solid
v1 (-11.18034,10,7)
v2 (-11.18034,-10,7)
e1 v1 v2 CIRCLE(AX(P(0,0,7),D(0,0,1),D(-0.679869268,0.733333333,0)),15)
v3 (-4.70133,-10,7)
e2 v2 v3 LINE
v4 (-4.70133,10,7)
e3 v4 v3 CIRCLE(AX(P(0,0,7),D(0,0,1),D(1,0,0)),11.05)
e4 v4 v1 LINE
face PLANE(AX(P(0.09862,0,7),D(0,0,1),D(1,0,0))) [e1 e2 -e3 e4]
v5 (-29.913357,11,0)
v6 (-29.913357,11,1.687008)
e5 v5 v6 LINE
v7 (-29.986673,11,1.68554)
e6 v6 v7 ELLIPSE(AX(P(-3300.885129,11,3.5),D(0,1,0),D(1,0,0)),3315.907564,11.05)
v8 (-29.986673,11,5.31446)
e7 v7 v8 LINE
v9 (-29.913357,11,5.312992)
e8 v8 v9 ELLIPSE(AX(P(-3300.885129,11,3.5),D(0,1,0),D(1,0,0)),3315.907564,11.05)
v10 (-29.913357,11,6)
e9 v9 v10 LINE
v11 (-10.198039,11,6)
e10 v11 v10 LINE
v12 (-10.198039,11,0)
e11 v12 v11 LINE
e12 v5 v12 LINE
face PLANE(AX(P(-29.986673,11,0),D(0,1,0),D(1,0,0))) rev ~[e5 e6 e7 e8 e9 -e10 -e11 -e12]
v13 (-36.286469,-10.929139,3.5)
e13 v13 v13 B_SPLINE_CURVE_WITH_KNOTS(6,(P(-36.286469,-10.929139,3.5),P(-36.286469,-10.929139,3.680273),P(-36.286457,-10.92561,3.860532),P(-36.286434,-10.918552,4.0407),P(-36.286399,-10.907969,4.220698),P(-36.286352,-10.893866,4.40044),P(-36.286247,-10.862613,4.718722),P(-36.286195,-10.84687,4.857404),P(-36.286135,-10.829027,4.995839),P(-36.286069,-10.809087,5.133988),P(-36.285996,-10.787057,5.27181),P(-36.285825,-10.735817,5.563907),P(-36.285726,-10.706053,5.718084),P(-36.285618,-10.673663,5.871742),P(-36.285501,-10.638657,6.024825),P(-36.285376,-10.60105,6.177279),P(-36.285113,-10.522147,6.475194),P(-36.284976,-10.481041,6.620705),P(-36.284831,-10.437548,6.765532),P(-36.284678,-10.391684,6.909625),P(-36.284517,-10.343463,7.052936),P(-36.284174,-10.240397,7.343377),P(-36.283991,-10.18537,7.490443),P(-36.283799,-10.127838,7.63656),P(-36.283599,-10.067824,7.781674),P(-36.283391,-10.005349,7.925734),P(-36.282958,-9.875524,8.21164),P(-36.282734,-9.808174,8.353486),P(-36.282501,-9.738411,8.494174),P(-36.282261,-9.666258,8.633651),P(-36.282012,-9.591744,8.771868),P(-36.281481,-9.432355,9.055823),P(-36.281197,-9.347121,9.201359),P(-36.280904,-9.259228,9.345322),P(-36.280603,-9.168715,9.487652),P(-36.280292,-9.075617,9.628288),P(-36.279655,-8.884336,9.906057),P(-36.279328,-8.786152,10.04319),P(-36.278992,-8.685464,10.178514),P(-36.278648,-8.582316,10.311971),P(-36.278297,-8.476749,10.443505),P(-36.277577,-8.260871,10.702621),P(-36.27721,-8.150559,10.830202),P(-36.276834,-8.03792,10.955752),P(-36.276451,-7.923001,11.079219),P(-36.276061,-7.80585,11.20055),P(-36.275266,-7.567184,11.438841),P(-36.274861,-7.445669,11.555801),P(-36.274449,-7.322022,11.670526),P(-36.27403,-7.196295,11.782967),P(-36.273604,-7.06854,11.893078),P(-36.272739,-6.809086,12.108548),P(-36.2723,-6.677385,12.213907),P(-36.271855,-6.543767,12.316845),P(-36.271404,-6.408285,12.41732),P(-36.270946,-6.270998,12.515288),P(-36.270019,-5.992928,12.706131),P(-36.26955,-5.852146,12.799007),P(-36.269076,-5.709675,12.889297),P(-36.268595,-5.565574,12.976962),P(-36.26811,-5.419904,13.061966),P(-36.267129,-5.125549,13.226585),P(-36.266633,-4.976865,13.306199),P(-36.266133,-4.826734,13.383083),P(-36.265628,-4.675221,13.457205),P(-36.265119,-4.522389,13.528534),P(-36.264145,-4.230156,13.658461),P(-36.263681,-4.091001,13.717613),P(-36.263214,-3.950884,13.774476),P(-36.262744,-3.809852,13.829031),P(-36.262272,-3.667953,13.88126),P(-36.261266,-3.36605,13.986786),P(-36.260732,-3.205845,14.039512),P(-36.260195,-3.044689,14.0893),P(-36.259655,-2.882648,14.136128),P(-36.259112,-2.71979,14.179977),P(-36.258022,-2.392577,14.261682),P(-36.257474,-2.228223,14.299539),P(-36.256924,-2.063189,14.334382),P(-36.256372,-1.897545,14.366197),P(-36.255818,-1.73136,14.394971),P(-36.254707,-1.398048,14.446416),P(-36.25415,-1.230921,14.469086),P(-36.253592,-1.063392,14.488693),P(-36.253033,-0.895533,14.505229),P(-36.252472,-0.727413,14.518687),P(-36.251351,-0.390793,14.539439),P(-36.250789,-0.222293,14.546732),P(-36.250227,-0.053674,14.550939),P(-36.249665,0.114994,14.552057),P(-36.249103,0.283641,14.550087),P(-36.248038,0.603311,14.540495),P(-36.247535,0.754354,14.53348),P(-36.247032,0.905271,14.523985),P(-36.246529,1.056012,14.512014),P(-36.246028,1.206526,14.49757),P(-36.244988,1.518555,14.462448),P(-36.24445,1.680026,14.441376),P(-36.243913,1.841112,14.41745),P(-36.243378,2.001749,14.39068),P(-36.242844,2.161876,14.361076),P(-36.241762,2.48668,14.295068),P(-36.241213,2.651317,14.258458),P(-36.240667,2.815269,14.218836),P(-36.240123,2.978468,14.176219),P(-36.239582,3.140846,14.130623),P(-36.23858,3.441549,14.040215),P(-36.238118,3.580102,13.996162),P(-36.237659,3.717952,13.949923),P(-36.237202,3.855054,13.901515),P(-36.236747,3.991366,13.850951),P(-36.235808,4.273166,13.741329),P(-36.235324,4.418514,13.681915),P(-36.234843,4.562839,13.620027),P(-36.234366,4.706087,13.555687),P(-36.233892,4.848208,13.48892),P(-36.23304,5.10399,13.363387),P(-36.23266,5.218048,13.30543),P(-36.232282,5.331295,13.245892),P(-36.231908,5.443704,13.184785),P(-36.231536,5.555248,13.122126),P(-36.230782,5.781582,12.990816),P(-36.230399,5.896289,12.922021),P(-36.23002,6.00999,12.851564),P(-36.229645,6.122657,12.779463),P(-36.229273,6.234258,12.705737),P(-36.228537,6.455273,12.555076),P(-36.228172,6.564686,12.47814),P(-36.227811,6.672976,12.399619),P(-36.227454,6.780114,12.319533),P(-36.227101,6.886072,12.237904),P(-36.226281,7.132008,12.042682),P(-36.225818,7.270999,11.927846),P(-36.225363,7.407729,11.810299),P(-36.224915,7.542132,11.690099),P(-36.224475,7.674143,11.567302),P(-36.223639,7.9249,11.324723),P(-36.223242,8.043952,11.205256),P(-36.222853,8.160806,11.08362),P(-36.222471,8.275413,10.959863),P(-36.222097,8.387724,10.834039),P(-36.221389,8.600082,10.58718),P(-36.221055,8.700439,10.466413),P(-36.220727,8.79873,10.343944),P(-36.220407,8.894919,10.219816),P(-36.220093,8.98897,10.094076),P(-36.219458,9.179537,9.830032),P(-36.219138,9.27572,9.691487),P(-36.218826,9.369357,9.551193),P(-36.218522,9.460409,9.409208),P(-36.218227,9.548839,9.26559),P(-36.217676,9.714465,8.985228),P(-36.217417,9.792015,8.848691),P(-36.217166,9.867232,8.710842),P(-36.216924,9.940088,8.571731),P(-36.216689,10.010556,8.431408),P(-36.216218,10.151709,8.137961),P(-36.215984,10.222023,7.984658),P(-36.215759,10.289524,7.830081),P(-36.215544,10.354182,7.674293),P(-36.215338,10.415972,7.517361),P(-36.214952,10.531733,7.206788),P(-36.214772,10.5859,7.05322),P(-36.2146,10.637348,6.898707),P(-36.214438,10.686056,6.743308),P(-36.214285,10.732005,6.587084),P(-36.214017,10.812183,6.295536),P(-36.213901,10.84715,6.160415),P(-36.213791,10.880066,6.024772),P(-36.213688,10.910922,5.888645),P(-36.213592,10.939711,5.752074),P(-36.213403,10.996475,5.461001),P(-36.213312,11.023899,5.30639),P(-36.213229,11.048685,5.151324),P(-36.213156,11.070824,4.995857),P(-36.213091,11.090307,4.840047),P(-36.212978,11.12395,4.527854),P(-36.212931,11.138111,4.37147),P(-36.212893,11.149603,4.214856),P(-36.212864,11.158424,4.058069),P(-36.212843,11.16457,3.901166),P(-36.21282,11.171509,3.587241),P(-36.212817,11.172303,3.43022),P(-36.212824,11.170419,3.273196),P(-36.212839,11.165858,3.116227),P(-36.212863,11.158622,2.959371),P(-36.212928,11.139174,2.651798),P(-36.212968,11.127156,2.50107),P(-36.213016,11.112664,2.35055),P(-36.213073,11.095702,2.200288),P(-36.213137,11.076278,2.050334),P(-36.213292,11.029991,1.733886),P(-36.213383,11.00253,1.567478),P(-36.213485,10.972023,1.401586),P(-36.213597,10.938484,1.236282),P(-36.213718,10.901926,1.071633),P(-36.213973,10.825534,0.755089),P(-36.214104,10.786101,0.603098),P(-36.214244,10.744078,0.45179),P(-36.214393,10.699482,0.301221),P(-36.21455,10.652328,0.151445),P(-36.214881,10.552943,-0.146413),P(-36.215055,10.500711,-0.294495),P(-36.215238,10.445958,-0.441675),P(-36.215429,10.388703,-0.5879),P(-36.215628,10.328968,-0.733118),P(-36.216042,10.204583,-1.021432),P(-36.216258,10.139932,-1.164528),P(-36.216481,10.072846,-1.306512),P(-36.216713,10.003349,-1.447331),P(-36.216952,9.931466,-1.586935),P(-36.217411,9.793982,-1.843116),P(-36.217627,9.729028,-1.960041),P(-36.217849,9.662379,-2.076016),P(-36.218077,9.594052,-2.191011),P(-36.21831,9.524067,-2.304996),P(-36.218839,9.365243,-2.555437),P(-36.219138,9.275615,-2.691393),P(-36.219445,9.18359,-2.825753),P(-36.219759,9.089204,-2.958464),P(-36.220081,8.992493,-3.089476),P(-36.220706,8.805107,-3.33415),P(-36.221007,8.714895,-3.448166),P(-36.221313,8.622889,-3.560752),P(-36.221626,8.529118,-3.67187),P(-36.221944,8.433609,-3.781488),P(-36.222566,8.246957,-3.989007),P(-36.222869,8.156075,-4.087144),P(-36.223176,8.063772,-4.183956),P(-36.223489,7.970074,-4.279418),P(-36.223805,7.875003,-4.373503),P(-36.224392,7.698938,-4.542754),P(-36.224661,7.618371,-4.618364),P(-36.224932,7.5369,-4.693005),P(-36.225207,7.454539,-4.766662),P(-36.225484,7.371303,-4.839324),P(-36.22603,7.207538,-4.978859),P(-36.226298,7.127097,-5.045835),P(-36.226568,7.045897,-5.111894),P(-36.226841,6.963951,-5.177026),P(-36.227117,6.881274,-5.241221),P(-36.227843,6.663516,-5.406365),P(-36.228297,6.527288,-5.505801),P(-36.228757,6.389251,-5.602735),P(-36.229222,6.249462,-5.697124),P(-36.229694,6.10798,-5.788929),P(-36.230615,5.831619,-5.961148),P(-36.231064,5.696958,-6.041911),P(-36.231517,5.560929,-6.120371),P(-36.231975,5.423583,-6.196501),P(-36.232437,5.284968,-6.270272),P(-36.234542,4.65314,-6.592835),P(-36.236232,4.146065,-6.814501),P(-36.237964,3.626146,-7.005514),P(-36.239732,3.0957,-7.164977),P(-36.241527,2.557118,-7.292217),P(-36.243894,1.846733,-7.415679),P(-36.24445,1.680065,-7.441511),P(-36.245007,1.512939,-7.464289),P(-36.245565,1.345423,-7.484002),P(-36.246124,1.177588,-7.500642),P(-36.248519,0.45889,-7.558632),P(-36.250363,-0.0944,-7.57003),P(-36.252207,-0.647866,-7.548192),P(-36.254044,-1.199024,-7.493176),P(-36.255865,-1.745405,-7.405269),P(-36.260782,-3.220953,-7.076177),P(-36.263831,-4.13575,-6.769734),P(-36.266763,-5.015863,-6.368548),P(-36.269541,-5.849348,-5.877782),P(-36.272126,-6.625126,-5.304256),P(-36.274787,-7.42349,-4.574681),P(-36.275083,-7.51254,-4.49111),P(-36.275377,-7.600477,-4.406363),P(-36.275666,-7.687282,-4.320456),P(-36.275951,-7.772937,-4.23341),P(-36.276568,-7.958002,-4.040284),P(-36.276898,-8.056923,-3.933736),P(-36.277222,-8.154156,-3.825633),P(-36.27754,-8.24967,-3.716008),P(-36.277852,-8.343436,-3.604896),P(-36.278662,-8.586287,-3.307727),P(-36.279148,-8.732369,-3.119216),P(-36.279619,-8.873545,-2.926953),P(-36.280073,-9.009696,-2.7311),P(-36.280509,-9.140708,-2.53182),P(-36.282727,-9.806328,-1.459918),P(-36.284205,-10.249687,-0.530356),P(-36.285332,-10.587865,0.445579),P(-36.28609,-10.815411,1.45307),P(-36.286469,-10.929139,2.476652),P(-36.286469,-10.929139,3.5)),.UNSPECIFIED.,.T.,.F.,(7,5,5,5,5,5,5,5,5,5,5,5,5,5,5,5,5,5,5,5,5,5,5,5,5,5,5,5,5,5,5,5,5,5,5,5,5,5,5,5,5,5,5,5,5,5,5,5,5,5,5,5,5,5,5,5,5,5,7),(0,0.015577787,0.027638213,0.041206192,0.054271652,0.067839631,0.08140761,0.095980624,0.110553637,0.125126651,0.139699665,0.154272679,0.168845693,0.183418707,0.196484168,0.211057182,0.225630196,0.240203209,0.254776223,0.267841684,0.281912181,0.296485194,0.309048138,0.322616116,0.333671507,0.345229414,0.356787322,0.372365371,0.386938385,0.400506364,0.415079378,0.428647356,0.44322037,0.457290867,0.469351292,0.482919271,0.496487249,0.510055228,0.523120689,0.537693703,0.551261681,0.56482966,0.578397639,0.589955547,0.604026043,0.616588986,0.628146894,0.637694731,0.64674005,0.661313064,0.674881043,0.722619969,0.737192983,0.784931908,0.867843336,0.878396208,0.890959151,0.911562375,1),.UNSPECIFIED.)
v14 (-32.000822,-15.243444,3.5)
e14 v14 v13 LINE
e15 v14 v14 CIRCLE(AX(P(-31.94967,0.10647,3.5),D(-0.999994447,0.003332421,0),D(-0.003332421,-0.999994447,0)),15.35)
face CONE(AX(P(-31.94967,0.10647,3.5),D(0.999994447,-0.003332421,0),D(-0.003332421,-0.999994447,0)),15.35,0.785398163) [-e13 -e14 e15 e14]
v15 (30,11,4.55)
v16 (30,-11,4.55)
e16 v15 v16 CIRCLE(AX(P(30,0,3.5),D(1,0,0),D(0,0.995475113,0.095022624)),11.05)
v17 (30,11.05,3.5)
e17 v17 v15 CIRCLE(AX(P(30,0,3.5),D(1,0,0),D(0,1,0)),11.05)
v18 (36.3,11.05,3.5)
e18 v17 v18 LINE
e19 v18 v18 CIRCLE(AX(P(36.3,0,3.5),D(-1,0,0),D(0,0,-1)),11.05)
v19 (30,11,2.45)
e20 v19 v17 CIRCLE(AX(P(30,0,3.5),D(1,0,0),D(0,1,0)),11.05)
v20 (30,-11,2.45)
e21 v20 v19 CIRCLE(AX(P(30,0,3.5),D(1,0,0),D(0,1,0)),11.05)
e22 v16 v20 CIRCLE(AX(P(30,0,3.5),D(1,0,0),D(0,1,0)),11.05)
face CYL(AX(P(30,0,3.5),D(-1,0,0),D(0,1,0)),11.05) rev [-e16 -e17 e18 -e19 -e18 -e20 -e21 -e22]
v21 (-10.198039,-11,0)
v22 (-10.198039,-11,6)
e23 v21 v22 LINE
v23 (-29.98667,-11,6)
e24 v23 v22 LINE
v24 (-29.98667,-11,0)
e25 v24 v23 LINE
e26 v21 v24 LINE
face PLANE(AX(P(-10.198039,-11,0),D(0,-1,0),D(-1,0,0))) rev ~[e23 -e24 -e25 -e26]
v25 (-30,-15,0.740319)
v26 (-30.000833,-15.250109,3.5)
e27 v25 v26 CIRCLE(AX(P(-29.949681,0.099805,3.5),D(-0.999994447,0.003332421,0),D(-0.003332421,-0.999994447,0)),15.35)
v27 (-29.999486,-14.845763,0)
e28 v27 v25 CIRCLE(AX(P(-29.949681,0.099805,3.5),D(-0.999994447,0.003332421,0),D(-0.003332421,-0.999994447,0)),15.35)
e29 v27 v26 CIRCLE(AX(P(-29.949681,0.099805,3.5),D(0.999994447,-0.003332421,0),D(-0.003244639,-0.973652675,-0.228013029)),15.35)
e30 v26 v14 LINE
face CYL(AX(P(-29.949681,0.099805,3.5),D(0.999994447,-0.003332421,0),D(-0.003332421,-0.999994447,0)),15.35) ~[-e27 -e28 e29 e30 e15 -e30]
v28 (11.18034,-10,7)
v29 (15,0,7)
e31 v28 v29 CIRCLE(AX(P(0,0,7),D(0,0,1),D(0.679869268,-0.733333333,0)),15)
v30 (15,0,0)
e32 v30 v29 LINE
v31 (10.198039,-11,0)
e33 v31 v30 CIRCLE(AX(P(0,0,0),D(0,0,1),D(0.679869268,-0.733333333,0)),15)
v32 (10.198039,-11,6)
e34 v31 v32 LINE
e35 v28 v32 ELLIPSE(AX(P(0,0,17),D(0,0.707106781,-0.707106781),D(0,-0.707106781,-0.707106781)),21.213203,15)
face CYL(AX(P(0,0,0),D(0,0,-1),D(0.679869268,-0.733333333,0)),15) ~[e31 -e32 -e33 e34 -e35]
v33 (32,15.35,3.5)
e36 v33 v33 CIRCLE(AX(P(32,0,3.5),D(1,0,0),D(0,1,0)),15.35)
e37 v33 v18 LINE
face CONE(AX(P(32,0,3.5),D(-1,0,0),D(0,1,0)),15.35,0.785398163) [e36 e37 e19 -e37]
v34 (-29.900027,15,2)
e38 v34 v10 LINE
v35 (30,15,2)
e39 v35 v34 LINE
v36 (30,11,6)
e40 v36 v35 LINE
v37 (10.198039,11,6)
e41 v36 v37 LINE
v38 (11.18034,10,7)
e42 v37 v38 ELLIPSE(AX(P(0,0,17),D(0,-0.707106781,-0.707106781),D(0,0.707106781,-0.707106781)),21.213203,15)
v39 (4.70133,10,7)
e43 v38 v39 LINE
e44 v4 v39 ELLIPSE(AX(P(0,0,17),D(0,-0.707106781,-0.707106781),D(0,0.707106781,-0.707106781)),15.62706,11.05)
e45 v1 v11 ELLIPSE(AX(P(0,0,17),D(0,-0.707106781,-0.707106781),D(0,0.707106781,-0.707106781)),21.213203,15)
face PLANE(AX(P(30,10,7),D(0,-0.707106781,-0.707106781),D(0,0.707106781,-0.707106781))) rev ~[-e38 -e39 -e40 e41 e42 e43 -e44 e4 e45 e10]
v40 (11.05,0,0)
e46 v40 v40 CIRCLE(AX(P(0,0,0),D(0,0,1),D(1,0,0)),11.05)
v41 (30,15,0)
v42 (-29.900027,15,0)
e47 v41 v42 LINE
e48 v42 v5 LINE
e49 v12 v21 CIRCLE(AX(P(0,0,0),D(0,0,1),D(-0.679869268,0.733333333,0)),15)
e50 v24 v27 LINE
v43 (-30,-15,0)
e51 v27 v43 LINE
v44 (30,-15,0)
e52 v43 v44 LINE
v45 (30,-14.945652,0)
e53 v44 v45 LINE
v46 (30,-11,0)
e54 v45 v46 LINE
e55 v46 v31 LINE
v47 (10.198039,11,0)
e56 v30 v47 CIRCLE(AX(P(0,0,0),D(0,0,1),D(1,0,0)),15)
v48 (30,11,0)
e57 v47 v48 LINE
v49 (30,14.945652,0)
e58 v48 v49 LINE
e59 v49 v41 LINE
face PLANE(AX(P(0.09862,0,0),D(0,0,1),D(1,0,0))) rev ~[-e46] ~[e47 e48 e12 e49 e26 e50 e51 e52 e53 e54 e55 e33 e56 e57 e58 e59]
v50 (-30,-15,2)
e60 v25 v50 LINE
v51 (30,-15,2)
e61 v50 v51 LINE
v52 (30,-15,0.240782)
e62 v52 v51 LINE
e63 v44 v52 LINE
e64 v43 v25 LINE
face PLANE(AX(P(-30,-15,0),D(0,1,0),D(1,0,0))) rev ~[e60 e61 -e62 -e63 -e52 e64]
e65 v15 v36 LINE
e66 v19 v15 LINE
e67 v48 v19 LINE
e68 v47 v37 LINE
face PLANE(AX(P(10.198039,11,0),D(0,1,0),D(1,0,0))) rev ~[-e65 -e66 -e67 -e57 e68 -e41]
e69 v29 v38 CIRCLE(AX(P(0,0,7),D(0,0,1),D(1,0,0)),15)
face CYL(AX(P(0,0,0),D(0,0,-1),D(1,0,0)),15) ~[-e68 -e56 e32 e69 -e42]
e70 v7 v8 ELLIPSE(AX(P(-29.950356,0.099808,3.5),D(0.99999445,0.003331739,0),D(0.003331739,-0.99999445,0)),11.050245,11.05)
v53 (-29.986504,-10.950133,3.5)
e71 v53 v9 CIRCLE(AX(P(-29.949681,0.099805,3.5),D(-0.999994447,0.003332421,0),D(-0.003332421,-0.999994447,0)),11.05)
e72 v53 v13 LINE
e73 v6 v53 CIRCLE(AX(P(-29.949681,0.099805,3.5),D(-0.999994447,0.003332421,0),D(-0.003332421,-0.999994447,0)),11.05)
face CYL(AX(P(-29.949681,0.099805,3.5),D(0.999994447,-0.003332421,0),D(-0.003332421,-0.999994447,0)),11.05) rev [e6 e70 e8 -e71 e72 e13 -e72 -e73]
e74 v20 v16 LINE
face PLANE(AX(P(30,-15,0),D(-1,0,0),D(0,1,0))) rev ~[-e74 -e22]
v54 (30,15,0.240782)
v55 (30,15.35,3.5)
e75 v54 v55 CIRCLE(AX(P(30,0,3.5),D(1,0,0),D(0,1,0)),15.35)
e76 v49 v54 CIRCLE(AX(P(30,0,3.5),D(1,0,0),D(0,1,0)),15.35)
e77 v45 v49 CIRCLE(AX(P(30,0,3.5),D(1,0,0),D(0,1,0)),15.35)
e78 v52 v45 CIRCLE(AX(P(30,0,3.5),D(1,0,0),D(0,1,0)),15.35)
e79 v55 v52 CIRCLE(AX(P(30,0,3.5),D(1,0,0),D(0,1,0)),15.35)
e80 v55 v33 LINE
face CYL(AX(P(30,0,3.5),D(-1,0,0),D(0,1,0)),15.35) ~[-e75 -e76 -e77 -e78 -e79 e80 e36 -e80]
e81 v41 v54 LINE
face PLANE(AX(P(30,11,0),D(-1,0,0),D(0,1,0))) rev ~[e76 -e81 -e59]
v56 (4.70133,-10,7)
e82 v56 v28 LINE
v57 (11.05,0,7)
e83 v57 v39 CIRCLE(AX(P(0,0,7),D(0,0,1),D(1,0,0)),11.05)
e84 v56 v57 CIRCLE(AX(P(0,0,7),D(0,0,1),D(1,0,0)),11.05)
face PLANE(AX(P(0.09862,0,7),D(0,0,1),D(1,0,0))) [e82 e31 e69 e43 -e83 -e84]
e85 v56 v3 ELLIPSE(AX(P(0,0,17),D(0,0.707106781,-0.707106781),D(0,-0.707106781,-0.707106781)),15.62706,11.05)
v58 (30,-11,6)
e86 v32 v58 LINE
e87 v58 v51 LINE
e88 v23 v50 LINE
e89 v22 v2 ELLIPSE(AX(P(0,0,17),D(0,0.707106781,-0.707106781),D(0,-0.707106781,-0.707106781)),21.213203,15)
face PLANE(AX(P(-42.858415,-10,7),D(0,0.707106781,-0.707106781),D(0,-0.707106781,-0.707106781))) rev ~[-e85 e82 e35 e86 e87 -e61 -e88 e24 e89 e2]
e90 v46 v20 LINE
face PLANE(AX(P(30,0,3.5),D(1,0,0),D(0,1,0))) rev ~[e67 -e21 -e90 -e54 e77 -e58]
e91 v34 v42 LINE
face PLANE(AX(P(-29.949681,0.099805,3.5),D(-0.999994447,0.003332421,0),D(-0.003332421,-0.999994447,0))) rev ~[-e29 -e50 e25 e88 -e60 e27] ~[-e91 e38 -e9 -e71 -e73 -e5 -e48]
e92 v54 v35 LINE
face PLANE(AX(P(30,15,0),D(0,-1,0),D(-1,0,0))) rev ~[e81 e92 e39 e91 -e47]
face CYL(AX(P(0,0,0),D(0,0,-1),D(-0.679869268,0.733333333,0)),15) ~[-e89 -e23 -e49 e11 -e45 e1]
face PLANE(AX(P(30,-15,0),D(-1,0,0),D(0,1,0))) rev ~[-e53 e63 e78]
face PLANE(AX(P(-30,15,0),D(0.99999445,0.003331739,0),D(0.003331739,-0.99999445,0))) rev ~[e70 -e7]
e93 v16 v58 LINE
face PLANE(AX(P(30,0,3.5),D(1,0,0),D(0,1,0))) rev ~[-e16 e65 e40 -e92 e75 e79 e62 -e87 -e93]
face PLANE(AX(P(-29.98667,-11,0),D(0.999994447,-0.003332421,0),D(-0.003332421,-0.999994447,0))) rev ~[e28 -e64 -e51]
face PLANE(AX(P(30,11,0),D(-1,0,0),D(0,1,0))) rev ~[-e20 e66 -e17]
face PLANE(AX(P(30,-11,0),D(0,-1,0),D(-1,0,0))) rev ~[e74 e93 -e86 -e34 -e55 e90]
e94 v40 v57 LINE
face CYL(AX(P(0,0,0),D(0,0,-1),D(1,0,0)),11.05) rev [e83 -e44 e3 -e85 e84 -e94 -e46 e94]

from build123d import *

# Parameters (mm, degrees)
F0_R        = 11.05
F1_DEPTH    = 7
F2_R        = 15.35
F2_R_2      = 11.05
F3_DEPTH    = 7
F4_R        = 15.35
F4_R_2      = 11.05
F5_DEPTH    = 7
F6_T4_DEPTH = 72.7584417561
F6_T9_DEPTH = 72.8584149398


# Not quite as in the source:
# - a fillet or chamfer that OpenCascade refuses, or shapes differently, is made with other operations: its cross-section is extruded or revolved along the edge and cut away or added


with BuildPart() as f1:
    # F0 (on Top) → F1 (new body)
    with BuildSketch(Plane.XY):
        with BuildLine():
            ThreePointArc((10.1980390272, -11), (13.7471921753, -6.0012254829), (15, 0))
            ThreePointArc((15, 0), (13.7471921753, 6.0012254829), (10.1980390272, 11))
            ThreePointArc((10.1980390272, 11), (5.4772255751, 13.9642400438), (0, 15))
            ThreePointArc((0, 15), (-5.4772255751, 13.9642400438), (-10.1980390272, 11))
            ThreePointArc((-10.1980390272, 11), (-15, 0), (-10.1980390272, -11))
            ThreePointArc((-10.1980390272, -11), (-5.4772255751, -13.9642400438), (0, -15))
            ThreePointArc((0, -15), (5.4772255751, -13.9642400438), (10.1980390272, -11))
        make_face()
        Circle(F0_R, mode=Mode.SUBTRACT)
        with BuildLine():
            ThreePointArc((0, 15), (5.4772255751, 13.9642400438), (10.1980390272, 11))
            Line((10.1980390272, 11), (30, 11))
            Line((30, 11), (30, 15))
            Line((30, 15), (0, 15))
        make_face()
        with BuildLine():
            Line((30, -11), (10.1980390272, -11))
            ThreePointArc((10.1980390272, -11), (5.4772255751, -13.9642400438), (0, -15))
            Line((0, -15), (30, -15))
            Line((30, -15), (30, -11))
        make_face()
        with BuildLine():
            ThreePointArc((-10.1980390272, 11), (-5.4772255751, 13.9642400438), (0, 15))
            Line((0, 15), (-30, 15))
            Line((-30, 15), (-29.9866729691, 11))
            Line((-29.9866729691, 11), (-10.1980390272, 11))
        make_face()
        with BuildLine():
            Line((-30, -15), (0, -15))
            ThreePointArc((0, -15), (-5.4772255751, -13.9642400438), (-10.1980390272, -11))
            Line((-10.1980390272, -11), (-29.9866702422, -11))
            Line((-29.9866702422, -11), (-30, -15))
        make_face()
    extrude(amount=F1_DEPTH)

    # F2 (on face) → F3 (join)
    with BuildSketch(Plane(origin=(-29.9496808123, 0.0998054981, 0), x_dir=(-0.003332421, -0.9999944475, 0), z_dir=(-0.9999944475, 0.003332421, 0))):
        with Locations((0, 3.5)):
            Circle(F2_R)
        with Locations((0, 3.5)):
            Circle(F2_R_2, mode=Mode.SUBTRACT)
    extrude(amount=F3_DEPTH)

    # F4 (on face) → F5 (join)
    with BuildSketch(Plane.YZ.offset(30)):
        with Locations((0, 3.5)):
            Circle(F4_R)
        with Locations((0, 3.5)):
            Circle(F4_R_2, mode=Mode.SUBTRACT)
    extrude(amount=F5_DEPTH)

    # F6: chamfer of 5 on 4 edges, made by hand


with BuildPart() as f6_tool2:
    # F6_s3 → F6_t4 (new body)
    with BuildSketch(Plane.YZ.offset(30)):
        Polygon((10, 7), (15, 2), (15, 7), align=None)
    extrude(amount=-F6_T4_DEPTH)

    split(bisect_by=Plane(origin=(-29.9496808123, 0.0998054981, 0), x_dir=(0, 0, 1), z_dir=(0.9999944475, -0.003332421, 0)), keep=Keep.TOP)


with BuildPart() as f1_1:
    add(f1.part)

    # F6_t1: cut F6_tool2
    add(f6_tool2.part, mode=Mode.SUBTRACT)


with BuildPart() as f6_tool7:
    # F6_s8 → F6_t9 (new body)
    with BuildSketch(Plane.YZ.offset(-42.8584149398)):
        Polygon((-10, 7), (-15, 2), (-15, 7), align=None)
    extrude(amount=F6_T9_DEPTH)

    split(bisect_by=Plane(origin=(-29.9496808123, 0.0998054981, 0), x_dir=(0, 0, 1), z_dir=(0.9999944475, -0.003332421, 0)), keep=Keep.TOP)


with BuildPart() as f1_2:
    add(f1_1.part)

    # F6_t6: cut F6_tool7
    add(f6_tool7.part, mode=Mode.SUBTRACT)

    # F6_s11 → F6_t12 (revolve, cut)
    with BuildSketch(Plane.XY.offset(3.5)):
        Polygon((32, 15.35), (37, 10.35), (37, 15.35), align=None)
    revolve(axis=Axis((37, 0, 3.5), (1, 0, 0)), mode=Mode.SUBTRACT)

    # F6_s13 → F6_t14 (revolve, cut)
    with BuildSketch(Plane.XY.offset(3.5)):
        Polygon((-32.0008223689, -15.2434444286), (-36.9841325015, -10.2268100865), (-37.0007946063, -15.2267823238), align=None)
    revolve(axis=Axis((-36.9496419446, 0.1231324448, 3.5), (-0.9999944475, 0.003332421, 0)), mode=Mode.SUBTRACT)


solid = f1_2.part
